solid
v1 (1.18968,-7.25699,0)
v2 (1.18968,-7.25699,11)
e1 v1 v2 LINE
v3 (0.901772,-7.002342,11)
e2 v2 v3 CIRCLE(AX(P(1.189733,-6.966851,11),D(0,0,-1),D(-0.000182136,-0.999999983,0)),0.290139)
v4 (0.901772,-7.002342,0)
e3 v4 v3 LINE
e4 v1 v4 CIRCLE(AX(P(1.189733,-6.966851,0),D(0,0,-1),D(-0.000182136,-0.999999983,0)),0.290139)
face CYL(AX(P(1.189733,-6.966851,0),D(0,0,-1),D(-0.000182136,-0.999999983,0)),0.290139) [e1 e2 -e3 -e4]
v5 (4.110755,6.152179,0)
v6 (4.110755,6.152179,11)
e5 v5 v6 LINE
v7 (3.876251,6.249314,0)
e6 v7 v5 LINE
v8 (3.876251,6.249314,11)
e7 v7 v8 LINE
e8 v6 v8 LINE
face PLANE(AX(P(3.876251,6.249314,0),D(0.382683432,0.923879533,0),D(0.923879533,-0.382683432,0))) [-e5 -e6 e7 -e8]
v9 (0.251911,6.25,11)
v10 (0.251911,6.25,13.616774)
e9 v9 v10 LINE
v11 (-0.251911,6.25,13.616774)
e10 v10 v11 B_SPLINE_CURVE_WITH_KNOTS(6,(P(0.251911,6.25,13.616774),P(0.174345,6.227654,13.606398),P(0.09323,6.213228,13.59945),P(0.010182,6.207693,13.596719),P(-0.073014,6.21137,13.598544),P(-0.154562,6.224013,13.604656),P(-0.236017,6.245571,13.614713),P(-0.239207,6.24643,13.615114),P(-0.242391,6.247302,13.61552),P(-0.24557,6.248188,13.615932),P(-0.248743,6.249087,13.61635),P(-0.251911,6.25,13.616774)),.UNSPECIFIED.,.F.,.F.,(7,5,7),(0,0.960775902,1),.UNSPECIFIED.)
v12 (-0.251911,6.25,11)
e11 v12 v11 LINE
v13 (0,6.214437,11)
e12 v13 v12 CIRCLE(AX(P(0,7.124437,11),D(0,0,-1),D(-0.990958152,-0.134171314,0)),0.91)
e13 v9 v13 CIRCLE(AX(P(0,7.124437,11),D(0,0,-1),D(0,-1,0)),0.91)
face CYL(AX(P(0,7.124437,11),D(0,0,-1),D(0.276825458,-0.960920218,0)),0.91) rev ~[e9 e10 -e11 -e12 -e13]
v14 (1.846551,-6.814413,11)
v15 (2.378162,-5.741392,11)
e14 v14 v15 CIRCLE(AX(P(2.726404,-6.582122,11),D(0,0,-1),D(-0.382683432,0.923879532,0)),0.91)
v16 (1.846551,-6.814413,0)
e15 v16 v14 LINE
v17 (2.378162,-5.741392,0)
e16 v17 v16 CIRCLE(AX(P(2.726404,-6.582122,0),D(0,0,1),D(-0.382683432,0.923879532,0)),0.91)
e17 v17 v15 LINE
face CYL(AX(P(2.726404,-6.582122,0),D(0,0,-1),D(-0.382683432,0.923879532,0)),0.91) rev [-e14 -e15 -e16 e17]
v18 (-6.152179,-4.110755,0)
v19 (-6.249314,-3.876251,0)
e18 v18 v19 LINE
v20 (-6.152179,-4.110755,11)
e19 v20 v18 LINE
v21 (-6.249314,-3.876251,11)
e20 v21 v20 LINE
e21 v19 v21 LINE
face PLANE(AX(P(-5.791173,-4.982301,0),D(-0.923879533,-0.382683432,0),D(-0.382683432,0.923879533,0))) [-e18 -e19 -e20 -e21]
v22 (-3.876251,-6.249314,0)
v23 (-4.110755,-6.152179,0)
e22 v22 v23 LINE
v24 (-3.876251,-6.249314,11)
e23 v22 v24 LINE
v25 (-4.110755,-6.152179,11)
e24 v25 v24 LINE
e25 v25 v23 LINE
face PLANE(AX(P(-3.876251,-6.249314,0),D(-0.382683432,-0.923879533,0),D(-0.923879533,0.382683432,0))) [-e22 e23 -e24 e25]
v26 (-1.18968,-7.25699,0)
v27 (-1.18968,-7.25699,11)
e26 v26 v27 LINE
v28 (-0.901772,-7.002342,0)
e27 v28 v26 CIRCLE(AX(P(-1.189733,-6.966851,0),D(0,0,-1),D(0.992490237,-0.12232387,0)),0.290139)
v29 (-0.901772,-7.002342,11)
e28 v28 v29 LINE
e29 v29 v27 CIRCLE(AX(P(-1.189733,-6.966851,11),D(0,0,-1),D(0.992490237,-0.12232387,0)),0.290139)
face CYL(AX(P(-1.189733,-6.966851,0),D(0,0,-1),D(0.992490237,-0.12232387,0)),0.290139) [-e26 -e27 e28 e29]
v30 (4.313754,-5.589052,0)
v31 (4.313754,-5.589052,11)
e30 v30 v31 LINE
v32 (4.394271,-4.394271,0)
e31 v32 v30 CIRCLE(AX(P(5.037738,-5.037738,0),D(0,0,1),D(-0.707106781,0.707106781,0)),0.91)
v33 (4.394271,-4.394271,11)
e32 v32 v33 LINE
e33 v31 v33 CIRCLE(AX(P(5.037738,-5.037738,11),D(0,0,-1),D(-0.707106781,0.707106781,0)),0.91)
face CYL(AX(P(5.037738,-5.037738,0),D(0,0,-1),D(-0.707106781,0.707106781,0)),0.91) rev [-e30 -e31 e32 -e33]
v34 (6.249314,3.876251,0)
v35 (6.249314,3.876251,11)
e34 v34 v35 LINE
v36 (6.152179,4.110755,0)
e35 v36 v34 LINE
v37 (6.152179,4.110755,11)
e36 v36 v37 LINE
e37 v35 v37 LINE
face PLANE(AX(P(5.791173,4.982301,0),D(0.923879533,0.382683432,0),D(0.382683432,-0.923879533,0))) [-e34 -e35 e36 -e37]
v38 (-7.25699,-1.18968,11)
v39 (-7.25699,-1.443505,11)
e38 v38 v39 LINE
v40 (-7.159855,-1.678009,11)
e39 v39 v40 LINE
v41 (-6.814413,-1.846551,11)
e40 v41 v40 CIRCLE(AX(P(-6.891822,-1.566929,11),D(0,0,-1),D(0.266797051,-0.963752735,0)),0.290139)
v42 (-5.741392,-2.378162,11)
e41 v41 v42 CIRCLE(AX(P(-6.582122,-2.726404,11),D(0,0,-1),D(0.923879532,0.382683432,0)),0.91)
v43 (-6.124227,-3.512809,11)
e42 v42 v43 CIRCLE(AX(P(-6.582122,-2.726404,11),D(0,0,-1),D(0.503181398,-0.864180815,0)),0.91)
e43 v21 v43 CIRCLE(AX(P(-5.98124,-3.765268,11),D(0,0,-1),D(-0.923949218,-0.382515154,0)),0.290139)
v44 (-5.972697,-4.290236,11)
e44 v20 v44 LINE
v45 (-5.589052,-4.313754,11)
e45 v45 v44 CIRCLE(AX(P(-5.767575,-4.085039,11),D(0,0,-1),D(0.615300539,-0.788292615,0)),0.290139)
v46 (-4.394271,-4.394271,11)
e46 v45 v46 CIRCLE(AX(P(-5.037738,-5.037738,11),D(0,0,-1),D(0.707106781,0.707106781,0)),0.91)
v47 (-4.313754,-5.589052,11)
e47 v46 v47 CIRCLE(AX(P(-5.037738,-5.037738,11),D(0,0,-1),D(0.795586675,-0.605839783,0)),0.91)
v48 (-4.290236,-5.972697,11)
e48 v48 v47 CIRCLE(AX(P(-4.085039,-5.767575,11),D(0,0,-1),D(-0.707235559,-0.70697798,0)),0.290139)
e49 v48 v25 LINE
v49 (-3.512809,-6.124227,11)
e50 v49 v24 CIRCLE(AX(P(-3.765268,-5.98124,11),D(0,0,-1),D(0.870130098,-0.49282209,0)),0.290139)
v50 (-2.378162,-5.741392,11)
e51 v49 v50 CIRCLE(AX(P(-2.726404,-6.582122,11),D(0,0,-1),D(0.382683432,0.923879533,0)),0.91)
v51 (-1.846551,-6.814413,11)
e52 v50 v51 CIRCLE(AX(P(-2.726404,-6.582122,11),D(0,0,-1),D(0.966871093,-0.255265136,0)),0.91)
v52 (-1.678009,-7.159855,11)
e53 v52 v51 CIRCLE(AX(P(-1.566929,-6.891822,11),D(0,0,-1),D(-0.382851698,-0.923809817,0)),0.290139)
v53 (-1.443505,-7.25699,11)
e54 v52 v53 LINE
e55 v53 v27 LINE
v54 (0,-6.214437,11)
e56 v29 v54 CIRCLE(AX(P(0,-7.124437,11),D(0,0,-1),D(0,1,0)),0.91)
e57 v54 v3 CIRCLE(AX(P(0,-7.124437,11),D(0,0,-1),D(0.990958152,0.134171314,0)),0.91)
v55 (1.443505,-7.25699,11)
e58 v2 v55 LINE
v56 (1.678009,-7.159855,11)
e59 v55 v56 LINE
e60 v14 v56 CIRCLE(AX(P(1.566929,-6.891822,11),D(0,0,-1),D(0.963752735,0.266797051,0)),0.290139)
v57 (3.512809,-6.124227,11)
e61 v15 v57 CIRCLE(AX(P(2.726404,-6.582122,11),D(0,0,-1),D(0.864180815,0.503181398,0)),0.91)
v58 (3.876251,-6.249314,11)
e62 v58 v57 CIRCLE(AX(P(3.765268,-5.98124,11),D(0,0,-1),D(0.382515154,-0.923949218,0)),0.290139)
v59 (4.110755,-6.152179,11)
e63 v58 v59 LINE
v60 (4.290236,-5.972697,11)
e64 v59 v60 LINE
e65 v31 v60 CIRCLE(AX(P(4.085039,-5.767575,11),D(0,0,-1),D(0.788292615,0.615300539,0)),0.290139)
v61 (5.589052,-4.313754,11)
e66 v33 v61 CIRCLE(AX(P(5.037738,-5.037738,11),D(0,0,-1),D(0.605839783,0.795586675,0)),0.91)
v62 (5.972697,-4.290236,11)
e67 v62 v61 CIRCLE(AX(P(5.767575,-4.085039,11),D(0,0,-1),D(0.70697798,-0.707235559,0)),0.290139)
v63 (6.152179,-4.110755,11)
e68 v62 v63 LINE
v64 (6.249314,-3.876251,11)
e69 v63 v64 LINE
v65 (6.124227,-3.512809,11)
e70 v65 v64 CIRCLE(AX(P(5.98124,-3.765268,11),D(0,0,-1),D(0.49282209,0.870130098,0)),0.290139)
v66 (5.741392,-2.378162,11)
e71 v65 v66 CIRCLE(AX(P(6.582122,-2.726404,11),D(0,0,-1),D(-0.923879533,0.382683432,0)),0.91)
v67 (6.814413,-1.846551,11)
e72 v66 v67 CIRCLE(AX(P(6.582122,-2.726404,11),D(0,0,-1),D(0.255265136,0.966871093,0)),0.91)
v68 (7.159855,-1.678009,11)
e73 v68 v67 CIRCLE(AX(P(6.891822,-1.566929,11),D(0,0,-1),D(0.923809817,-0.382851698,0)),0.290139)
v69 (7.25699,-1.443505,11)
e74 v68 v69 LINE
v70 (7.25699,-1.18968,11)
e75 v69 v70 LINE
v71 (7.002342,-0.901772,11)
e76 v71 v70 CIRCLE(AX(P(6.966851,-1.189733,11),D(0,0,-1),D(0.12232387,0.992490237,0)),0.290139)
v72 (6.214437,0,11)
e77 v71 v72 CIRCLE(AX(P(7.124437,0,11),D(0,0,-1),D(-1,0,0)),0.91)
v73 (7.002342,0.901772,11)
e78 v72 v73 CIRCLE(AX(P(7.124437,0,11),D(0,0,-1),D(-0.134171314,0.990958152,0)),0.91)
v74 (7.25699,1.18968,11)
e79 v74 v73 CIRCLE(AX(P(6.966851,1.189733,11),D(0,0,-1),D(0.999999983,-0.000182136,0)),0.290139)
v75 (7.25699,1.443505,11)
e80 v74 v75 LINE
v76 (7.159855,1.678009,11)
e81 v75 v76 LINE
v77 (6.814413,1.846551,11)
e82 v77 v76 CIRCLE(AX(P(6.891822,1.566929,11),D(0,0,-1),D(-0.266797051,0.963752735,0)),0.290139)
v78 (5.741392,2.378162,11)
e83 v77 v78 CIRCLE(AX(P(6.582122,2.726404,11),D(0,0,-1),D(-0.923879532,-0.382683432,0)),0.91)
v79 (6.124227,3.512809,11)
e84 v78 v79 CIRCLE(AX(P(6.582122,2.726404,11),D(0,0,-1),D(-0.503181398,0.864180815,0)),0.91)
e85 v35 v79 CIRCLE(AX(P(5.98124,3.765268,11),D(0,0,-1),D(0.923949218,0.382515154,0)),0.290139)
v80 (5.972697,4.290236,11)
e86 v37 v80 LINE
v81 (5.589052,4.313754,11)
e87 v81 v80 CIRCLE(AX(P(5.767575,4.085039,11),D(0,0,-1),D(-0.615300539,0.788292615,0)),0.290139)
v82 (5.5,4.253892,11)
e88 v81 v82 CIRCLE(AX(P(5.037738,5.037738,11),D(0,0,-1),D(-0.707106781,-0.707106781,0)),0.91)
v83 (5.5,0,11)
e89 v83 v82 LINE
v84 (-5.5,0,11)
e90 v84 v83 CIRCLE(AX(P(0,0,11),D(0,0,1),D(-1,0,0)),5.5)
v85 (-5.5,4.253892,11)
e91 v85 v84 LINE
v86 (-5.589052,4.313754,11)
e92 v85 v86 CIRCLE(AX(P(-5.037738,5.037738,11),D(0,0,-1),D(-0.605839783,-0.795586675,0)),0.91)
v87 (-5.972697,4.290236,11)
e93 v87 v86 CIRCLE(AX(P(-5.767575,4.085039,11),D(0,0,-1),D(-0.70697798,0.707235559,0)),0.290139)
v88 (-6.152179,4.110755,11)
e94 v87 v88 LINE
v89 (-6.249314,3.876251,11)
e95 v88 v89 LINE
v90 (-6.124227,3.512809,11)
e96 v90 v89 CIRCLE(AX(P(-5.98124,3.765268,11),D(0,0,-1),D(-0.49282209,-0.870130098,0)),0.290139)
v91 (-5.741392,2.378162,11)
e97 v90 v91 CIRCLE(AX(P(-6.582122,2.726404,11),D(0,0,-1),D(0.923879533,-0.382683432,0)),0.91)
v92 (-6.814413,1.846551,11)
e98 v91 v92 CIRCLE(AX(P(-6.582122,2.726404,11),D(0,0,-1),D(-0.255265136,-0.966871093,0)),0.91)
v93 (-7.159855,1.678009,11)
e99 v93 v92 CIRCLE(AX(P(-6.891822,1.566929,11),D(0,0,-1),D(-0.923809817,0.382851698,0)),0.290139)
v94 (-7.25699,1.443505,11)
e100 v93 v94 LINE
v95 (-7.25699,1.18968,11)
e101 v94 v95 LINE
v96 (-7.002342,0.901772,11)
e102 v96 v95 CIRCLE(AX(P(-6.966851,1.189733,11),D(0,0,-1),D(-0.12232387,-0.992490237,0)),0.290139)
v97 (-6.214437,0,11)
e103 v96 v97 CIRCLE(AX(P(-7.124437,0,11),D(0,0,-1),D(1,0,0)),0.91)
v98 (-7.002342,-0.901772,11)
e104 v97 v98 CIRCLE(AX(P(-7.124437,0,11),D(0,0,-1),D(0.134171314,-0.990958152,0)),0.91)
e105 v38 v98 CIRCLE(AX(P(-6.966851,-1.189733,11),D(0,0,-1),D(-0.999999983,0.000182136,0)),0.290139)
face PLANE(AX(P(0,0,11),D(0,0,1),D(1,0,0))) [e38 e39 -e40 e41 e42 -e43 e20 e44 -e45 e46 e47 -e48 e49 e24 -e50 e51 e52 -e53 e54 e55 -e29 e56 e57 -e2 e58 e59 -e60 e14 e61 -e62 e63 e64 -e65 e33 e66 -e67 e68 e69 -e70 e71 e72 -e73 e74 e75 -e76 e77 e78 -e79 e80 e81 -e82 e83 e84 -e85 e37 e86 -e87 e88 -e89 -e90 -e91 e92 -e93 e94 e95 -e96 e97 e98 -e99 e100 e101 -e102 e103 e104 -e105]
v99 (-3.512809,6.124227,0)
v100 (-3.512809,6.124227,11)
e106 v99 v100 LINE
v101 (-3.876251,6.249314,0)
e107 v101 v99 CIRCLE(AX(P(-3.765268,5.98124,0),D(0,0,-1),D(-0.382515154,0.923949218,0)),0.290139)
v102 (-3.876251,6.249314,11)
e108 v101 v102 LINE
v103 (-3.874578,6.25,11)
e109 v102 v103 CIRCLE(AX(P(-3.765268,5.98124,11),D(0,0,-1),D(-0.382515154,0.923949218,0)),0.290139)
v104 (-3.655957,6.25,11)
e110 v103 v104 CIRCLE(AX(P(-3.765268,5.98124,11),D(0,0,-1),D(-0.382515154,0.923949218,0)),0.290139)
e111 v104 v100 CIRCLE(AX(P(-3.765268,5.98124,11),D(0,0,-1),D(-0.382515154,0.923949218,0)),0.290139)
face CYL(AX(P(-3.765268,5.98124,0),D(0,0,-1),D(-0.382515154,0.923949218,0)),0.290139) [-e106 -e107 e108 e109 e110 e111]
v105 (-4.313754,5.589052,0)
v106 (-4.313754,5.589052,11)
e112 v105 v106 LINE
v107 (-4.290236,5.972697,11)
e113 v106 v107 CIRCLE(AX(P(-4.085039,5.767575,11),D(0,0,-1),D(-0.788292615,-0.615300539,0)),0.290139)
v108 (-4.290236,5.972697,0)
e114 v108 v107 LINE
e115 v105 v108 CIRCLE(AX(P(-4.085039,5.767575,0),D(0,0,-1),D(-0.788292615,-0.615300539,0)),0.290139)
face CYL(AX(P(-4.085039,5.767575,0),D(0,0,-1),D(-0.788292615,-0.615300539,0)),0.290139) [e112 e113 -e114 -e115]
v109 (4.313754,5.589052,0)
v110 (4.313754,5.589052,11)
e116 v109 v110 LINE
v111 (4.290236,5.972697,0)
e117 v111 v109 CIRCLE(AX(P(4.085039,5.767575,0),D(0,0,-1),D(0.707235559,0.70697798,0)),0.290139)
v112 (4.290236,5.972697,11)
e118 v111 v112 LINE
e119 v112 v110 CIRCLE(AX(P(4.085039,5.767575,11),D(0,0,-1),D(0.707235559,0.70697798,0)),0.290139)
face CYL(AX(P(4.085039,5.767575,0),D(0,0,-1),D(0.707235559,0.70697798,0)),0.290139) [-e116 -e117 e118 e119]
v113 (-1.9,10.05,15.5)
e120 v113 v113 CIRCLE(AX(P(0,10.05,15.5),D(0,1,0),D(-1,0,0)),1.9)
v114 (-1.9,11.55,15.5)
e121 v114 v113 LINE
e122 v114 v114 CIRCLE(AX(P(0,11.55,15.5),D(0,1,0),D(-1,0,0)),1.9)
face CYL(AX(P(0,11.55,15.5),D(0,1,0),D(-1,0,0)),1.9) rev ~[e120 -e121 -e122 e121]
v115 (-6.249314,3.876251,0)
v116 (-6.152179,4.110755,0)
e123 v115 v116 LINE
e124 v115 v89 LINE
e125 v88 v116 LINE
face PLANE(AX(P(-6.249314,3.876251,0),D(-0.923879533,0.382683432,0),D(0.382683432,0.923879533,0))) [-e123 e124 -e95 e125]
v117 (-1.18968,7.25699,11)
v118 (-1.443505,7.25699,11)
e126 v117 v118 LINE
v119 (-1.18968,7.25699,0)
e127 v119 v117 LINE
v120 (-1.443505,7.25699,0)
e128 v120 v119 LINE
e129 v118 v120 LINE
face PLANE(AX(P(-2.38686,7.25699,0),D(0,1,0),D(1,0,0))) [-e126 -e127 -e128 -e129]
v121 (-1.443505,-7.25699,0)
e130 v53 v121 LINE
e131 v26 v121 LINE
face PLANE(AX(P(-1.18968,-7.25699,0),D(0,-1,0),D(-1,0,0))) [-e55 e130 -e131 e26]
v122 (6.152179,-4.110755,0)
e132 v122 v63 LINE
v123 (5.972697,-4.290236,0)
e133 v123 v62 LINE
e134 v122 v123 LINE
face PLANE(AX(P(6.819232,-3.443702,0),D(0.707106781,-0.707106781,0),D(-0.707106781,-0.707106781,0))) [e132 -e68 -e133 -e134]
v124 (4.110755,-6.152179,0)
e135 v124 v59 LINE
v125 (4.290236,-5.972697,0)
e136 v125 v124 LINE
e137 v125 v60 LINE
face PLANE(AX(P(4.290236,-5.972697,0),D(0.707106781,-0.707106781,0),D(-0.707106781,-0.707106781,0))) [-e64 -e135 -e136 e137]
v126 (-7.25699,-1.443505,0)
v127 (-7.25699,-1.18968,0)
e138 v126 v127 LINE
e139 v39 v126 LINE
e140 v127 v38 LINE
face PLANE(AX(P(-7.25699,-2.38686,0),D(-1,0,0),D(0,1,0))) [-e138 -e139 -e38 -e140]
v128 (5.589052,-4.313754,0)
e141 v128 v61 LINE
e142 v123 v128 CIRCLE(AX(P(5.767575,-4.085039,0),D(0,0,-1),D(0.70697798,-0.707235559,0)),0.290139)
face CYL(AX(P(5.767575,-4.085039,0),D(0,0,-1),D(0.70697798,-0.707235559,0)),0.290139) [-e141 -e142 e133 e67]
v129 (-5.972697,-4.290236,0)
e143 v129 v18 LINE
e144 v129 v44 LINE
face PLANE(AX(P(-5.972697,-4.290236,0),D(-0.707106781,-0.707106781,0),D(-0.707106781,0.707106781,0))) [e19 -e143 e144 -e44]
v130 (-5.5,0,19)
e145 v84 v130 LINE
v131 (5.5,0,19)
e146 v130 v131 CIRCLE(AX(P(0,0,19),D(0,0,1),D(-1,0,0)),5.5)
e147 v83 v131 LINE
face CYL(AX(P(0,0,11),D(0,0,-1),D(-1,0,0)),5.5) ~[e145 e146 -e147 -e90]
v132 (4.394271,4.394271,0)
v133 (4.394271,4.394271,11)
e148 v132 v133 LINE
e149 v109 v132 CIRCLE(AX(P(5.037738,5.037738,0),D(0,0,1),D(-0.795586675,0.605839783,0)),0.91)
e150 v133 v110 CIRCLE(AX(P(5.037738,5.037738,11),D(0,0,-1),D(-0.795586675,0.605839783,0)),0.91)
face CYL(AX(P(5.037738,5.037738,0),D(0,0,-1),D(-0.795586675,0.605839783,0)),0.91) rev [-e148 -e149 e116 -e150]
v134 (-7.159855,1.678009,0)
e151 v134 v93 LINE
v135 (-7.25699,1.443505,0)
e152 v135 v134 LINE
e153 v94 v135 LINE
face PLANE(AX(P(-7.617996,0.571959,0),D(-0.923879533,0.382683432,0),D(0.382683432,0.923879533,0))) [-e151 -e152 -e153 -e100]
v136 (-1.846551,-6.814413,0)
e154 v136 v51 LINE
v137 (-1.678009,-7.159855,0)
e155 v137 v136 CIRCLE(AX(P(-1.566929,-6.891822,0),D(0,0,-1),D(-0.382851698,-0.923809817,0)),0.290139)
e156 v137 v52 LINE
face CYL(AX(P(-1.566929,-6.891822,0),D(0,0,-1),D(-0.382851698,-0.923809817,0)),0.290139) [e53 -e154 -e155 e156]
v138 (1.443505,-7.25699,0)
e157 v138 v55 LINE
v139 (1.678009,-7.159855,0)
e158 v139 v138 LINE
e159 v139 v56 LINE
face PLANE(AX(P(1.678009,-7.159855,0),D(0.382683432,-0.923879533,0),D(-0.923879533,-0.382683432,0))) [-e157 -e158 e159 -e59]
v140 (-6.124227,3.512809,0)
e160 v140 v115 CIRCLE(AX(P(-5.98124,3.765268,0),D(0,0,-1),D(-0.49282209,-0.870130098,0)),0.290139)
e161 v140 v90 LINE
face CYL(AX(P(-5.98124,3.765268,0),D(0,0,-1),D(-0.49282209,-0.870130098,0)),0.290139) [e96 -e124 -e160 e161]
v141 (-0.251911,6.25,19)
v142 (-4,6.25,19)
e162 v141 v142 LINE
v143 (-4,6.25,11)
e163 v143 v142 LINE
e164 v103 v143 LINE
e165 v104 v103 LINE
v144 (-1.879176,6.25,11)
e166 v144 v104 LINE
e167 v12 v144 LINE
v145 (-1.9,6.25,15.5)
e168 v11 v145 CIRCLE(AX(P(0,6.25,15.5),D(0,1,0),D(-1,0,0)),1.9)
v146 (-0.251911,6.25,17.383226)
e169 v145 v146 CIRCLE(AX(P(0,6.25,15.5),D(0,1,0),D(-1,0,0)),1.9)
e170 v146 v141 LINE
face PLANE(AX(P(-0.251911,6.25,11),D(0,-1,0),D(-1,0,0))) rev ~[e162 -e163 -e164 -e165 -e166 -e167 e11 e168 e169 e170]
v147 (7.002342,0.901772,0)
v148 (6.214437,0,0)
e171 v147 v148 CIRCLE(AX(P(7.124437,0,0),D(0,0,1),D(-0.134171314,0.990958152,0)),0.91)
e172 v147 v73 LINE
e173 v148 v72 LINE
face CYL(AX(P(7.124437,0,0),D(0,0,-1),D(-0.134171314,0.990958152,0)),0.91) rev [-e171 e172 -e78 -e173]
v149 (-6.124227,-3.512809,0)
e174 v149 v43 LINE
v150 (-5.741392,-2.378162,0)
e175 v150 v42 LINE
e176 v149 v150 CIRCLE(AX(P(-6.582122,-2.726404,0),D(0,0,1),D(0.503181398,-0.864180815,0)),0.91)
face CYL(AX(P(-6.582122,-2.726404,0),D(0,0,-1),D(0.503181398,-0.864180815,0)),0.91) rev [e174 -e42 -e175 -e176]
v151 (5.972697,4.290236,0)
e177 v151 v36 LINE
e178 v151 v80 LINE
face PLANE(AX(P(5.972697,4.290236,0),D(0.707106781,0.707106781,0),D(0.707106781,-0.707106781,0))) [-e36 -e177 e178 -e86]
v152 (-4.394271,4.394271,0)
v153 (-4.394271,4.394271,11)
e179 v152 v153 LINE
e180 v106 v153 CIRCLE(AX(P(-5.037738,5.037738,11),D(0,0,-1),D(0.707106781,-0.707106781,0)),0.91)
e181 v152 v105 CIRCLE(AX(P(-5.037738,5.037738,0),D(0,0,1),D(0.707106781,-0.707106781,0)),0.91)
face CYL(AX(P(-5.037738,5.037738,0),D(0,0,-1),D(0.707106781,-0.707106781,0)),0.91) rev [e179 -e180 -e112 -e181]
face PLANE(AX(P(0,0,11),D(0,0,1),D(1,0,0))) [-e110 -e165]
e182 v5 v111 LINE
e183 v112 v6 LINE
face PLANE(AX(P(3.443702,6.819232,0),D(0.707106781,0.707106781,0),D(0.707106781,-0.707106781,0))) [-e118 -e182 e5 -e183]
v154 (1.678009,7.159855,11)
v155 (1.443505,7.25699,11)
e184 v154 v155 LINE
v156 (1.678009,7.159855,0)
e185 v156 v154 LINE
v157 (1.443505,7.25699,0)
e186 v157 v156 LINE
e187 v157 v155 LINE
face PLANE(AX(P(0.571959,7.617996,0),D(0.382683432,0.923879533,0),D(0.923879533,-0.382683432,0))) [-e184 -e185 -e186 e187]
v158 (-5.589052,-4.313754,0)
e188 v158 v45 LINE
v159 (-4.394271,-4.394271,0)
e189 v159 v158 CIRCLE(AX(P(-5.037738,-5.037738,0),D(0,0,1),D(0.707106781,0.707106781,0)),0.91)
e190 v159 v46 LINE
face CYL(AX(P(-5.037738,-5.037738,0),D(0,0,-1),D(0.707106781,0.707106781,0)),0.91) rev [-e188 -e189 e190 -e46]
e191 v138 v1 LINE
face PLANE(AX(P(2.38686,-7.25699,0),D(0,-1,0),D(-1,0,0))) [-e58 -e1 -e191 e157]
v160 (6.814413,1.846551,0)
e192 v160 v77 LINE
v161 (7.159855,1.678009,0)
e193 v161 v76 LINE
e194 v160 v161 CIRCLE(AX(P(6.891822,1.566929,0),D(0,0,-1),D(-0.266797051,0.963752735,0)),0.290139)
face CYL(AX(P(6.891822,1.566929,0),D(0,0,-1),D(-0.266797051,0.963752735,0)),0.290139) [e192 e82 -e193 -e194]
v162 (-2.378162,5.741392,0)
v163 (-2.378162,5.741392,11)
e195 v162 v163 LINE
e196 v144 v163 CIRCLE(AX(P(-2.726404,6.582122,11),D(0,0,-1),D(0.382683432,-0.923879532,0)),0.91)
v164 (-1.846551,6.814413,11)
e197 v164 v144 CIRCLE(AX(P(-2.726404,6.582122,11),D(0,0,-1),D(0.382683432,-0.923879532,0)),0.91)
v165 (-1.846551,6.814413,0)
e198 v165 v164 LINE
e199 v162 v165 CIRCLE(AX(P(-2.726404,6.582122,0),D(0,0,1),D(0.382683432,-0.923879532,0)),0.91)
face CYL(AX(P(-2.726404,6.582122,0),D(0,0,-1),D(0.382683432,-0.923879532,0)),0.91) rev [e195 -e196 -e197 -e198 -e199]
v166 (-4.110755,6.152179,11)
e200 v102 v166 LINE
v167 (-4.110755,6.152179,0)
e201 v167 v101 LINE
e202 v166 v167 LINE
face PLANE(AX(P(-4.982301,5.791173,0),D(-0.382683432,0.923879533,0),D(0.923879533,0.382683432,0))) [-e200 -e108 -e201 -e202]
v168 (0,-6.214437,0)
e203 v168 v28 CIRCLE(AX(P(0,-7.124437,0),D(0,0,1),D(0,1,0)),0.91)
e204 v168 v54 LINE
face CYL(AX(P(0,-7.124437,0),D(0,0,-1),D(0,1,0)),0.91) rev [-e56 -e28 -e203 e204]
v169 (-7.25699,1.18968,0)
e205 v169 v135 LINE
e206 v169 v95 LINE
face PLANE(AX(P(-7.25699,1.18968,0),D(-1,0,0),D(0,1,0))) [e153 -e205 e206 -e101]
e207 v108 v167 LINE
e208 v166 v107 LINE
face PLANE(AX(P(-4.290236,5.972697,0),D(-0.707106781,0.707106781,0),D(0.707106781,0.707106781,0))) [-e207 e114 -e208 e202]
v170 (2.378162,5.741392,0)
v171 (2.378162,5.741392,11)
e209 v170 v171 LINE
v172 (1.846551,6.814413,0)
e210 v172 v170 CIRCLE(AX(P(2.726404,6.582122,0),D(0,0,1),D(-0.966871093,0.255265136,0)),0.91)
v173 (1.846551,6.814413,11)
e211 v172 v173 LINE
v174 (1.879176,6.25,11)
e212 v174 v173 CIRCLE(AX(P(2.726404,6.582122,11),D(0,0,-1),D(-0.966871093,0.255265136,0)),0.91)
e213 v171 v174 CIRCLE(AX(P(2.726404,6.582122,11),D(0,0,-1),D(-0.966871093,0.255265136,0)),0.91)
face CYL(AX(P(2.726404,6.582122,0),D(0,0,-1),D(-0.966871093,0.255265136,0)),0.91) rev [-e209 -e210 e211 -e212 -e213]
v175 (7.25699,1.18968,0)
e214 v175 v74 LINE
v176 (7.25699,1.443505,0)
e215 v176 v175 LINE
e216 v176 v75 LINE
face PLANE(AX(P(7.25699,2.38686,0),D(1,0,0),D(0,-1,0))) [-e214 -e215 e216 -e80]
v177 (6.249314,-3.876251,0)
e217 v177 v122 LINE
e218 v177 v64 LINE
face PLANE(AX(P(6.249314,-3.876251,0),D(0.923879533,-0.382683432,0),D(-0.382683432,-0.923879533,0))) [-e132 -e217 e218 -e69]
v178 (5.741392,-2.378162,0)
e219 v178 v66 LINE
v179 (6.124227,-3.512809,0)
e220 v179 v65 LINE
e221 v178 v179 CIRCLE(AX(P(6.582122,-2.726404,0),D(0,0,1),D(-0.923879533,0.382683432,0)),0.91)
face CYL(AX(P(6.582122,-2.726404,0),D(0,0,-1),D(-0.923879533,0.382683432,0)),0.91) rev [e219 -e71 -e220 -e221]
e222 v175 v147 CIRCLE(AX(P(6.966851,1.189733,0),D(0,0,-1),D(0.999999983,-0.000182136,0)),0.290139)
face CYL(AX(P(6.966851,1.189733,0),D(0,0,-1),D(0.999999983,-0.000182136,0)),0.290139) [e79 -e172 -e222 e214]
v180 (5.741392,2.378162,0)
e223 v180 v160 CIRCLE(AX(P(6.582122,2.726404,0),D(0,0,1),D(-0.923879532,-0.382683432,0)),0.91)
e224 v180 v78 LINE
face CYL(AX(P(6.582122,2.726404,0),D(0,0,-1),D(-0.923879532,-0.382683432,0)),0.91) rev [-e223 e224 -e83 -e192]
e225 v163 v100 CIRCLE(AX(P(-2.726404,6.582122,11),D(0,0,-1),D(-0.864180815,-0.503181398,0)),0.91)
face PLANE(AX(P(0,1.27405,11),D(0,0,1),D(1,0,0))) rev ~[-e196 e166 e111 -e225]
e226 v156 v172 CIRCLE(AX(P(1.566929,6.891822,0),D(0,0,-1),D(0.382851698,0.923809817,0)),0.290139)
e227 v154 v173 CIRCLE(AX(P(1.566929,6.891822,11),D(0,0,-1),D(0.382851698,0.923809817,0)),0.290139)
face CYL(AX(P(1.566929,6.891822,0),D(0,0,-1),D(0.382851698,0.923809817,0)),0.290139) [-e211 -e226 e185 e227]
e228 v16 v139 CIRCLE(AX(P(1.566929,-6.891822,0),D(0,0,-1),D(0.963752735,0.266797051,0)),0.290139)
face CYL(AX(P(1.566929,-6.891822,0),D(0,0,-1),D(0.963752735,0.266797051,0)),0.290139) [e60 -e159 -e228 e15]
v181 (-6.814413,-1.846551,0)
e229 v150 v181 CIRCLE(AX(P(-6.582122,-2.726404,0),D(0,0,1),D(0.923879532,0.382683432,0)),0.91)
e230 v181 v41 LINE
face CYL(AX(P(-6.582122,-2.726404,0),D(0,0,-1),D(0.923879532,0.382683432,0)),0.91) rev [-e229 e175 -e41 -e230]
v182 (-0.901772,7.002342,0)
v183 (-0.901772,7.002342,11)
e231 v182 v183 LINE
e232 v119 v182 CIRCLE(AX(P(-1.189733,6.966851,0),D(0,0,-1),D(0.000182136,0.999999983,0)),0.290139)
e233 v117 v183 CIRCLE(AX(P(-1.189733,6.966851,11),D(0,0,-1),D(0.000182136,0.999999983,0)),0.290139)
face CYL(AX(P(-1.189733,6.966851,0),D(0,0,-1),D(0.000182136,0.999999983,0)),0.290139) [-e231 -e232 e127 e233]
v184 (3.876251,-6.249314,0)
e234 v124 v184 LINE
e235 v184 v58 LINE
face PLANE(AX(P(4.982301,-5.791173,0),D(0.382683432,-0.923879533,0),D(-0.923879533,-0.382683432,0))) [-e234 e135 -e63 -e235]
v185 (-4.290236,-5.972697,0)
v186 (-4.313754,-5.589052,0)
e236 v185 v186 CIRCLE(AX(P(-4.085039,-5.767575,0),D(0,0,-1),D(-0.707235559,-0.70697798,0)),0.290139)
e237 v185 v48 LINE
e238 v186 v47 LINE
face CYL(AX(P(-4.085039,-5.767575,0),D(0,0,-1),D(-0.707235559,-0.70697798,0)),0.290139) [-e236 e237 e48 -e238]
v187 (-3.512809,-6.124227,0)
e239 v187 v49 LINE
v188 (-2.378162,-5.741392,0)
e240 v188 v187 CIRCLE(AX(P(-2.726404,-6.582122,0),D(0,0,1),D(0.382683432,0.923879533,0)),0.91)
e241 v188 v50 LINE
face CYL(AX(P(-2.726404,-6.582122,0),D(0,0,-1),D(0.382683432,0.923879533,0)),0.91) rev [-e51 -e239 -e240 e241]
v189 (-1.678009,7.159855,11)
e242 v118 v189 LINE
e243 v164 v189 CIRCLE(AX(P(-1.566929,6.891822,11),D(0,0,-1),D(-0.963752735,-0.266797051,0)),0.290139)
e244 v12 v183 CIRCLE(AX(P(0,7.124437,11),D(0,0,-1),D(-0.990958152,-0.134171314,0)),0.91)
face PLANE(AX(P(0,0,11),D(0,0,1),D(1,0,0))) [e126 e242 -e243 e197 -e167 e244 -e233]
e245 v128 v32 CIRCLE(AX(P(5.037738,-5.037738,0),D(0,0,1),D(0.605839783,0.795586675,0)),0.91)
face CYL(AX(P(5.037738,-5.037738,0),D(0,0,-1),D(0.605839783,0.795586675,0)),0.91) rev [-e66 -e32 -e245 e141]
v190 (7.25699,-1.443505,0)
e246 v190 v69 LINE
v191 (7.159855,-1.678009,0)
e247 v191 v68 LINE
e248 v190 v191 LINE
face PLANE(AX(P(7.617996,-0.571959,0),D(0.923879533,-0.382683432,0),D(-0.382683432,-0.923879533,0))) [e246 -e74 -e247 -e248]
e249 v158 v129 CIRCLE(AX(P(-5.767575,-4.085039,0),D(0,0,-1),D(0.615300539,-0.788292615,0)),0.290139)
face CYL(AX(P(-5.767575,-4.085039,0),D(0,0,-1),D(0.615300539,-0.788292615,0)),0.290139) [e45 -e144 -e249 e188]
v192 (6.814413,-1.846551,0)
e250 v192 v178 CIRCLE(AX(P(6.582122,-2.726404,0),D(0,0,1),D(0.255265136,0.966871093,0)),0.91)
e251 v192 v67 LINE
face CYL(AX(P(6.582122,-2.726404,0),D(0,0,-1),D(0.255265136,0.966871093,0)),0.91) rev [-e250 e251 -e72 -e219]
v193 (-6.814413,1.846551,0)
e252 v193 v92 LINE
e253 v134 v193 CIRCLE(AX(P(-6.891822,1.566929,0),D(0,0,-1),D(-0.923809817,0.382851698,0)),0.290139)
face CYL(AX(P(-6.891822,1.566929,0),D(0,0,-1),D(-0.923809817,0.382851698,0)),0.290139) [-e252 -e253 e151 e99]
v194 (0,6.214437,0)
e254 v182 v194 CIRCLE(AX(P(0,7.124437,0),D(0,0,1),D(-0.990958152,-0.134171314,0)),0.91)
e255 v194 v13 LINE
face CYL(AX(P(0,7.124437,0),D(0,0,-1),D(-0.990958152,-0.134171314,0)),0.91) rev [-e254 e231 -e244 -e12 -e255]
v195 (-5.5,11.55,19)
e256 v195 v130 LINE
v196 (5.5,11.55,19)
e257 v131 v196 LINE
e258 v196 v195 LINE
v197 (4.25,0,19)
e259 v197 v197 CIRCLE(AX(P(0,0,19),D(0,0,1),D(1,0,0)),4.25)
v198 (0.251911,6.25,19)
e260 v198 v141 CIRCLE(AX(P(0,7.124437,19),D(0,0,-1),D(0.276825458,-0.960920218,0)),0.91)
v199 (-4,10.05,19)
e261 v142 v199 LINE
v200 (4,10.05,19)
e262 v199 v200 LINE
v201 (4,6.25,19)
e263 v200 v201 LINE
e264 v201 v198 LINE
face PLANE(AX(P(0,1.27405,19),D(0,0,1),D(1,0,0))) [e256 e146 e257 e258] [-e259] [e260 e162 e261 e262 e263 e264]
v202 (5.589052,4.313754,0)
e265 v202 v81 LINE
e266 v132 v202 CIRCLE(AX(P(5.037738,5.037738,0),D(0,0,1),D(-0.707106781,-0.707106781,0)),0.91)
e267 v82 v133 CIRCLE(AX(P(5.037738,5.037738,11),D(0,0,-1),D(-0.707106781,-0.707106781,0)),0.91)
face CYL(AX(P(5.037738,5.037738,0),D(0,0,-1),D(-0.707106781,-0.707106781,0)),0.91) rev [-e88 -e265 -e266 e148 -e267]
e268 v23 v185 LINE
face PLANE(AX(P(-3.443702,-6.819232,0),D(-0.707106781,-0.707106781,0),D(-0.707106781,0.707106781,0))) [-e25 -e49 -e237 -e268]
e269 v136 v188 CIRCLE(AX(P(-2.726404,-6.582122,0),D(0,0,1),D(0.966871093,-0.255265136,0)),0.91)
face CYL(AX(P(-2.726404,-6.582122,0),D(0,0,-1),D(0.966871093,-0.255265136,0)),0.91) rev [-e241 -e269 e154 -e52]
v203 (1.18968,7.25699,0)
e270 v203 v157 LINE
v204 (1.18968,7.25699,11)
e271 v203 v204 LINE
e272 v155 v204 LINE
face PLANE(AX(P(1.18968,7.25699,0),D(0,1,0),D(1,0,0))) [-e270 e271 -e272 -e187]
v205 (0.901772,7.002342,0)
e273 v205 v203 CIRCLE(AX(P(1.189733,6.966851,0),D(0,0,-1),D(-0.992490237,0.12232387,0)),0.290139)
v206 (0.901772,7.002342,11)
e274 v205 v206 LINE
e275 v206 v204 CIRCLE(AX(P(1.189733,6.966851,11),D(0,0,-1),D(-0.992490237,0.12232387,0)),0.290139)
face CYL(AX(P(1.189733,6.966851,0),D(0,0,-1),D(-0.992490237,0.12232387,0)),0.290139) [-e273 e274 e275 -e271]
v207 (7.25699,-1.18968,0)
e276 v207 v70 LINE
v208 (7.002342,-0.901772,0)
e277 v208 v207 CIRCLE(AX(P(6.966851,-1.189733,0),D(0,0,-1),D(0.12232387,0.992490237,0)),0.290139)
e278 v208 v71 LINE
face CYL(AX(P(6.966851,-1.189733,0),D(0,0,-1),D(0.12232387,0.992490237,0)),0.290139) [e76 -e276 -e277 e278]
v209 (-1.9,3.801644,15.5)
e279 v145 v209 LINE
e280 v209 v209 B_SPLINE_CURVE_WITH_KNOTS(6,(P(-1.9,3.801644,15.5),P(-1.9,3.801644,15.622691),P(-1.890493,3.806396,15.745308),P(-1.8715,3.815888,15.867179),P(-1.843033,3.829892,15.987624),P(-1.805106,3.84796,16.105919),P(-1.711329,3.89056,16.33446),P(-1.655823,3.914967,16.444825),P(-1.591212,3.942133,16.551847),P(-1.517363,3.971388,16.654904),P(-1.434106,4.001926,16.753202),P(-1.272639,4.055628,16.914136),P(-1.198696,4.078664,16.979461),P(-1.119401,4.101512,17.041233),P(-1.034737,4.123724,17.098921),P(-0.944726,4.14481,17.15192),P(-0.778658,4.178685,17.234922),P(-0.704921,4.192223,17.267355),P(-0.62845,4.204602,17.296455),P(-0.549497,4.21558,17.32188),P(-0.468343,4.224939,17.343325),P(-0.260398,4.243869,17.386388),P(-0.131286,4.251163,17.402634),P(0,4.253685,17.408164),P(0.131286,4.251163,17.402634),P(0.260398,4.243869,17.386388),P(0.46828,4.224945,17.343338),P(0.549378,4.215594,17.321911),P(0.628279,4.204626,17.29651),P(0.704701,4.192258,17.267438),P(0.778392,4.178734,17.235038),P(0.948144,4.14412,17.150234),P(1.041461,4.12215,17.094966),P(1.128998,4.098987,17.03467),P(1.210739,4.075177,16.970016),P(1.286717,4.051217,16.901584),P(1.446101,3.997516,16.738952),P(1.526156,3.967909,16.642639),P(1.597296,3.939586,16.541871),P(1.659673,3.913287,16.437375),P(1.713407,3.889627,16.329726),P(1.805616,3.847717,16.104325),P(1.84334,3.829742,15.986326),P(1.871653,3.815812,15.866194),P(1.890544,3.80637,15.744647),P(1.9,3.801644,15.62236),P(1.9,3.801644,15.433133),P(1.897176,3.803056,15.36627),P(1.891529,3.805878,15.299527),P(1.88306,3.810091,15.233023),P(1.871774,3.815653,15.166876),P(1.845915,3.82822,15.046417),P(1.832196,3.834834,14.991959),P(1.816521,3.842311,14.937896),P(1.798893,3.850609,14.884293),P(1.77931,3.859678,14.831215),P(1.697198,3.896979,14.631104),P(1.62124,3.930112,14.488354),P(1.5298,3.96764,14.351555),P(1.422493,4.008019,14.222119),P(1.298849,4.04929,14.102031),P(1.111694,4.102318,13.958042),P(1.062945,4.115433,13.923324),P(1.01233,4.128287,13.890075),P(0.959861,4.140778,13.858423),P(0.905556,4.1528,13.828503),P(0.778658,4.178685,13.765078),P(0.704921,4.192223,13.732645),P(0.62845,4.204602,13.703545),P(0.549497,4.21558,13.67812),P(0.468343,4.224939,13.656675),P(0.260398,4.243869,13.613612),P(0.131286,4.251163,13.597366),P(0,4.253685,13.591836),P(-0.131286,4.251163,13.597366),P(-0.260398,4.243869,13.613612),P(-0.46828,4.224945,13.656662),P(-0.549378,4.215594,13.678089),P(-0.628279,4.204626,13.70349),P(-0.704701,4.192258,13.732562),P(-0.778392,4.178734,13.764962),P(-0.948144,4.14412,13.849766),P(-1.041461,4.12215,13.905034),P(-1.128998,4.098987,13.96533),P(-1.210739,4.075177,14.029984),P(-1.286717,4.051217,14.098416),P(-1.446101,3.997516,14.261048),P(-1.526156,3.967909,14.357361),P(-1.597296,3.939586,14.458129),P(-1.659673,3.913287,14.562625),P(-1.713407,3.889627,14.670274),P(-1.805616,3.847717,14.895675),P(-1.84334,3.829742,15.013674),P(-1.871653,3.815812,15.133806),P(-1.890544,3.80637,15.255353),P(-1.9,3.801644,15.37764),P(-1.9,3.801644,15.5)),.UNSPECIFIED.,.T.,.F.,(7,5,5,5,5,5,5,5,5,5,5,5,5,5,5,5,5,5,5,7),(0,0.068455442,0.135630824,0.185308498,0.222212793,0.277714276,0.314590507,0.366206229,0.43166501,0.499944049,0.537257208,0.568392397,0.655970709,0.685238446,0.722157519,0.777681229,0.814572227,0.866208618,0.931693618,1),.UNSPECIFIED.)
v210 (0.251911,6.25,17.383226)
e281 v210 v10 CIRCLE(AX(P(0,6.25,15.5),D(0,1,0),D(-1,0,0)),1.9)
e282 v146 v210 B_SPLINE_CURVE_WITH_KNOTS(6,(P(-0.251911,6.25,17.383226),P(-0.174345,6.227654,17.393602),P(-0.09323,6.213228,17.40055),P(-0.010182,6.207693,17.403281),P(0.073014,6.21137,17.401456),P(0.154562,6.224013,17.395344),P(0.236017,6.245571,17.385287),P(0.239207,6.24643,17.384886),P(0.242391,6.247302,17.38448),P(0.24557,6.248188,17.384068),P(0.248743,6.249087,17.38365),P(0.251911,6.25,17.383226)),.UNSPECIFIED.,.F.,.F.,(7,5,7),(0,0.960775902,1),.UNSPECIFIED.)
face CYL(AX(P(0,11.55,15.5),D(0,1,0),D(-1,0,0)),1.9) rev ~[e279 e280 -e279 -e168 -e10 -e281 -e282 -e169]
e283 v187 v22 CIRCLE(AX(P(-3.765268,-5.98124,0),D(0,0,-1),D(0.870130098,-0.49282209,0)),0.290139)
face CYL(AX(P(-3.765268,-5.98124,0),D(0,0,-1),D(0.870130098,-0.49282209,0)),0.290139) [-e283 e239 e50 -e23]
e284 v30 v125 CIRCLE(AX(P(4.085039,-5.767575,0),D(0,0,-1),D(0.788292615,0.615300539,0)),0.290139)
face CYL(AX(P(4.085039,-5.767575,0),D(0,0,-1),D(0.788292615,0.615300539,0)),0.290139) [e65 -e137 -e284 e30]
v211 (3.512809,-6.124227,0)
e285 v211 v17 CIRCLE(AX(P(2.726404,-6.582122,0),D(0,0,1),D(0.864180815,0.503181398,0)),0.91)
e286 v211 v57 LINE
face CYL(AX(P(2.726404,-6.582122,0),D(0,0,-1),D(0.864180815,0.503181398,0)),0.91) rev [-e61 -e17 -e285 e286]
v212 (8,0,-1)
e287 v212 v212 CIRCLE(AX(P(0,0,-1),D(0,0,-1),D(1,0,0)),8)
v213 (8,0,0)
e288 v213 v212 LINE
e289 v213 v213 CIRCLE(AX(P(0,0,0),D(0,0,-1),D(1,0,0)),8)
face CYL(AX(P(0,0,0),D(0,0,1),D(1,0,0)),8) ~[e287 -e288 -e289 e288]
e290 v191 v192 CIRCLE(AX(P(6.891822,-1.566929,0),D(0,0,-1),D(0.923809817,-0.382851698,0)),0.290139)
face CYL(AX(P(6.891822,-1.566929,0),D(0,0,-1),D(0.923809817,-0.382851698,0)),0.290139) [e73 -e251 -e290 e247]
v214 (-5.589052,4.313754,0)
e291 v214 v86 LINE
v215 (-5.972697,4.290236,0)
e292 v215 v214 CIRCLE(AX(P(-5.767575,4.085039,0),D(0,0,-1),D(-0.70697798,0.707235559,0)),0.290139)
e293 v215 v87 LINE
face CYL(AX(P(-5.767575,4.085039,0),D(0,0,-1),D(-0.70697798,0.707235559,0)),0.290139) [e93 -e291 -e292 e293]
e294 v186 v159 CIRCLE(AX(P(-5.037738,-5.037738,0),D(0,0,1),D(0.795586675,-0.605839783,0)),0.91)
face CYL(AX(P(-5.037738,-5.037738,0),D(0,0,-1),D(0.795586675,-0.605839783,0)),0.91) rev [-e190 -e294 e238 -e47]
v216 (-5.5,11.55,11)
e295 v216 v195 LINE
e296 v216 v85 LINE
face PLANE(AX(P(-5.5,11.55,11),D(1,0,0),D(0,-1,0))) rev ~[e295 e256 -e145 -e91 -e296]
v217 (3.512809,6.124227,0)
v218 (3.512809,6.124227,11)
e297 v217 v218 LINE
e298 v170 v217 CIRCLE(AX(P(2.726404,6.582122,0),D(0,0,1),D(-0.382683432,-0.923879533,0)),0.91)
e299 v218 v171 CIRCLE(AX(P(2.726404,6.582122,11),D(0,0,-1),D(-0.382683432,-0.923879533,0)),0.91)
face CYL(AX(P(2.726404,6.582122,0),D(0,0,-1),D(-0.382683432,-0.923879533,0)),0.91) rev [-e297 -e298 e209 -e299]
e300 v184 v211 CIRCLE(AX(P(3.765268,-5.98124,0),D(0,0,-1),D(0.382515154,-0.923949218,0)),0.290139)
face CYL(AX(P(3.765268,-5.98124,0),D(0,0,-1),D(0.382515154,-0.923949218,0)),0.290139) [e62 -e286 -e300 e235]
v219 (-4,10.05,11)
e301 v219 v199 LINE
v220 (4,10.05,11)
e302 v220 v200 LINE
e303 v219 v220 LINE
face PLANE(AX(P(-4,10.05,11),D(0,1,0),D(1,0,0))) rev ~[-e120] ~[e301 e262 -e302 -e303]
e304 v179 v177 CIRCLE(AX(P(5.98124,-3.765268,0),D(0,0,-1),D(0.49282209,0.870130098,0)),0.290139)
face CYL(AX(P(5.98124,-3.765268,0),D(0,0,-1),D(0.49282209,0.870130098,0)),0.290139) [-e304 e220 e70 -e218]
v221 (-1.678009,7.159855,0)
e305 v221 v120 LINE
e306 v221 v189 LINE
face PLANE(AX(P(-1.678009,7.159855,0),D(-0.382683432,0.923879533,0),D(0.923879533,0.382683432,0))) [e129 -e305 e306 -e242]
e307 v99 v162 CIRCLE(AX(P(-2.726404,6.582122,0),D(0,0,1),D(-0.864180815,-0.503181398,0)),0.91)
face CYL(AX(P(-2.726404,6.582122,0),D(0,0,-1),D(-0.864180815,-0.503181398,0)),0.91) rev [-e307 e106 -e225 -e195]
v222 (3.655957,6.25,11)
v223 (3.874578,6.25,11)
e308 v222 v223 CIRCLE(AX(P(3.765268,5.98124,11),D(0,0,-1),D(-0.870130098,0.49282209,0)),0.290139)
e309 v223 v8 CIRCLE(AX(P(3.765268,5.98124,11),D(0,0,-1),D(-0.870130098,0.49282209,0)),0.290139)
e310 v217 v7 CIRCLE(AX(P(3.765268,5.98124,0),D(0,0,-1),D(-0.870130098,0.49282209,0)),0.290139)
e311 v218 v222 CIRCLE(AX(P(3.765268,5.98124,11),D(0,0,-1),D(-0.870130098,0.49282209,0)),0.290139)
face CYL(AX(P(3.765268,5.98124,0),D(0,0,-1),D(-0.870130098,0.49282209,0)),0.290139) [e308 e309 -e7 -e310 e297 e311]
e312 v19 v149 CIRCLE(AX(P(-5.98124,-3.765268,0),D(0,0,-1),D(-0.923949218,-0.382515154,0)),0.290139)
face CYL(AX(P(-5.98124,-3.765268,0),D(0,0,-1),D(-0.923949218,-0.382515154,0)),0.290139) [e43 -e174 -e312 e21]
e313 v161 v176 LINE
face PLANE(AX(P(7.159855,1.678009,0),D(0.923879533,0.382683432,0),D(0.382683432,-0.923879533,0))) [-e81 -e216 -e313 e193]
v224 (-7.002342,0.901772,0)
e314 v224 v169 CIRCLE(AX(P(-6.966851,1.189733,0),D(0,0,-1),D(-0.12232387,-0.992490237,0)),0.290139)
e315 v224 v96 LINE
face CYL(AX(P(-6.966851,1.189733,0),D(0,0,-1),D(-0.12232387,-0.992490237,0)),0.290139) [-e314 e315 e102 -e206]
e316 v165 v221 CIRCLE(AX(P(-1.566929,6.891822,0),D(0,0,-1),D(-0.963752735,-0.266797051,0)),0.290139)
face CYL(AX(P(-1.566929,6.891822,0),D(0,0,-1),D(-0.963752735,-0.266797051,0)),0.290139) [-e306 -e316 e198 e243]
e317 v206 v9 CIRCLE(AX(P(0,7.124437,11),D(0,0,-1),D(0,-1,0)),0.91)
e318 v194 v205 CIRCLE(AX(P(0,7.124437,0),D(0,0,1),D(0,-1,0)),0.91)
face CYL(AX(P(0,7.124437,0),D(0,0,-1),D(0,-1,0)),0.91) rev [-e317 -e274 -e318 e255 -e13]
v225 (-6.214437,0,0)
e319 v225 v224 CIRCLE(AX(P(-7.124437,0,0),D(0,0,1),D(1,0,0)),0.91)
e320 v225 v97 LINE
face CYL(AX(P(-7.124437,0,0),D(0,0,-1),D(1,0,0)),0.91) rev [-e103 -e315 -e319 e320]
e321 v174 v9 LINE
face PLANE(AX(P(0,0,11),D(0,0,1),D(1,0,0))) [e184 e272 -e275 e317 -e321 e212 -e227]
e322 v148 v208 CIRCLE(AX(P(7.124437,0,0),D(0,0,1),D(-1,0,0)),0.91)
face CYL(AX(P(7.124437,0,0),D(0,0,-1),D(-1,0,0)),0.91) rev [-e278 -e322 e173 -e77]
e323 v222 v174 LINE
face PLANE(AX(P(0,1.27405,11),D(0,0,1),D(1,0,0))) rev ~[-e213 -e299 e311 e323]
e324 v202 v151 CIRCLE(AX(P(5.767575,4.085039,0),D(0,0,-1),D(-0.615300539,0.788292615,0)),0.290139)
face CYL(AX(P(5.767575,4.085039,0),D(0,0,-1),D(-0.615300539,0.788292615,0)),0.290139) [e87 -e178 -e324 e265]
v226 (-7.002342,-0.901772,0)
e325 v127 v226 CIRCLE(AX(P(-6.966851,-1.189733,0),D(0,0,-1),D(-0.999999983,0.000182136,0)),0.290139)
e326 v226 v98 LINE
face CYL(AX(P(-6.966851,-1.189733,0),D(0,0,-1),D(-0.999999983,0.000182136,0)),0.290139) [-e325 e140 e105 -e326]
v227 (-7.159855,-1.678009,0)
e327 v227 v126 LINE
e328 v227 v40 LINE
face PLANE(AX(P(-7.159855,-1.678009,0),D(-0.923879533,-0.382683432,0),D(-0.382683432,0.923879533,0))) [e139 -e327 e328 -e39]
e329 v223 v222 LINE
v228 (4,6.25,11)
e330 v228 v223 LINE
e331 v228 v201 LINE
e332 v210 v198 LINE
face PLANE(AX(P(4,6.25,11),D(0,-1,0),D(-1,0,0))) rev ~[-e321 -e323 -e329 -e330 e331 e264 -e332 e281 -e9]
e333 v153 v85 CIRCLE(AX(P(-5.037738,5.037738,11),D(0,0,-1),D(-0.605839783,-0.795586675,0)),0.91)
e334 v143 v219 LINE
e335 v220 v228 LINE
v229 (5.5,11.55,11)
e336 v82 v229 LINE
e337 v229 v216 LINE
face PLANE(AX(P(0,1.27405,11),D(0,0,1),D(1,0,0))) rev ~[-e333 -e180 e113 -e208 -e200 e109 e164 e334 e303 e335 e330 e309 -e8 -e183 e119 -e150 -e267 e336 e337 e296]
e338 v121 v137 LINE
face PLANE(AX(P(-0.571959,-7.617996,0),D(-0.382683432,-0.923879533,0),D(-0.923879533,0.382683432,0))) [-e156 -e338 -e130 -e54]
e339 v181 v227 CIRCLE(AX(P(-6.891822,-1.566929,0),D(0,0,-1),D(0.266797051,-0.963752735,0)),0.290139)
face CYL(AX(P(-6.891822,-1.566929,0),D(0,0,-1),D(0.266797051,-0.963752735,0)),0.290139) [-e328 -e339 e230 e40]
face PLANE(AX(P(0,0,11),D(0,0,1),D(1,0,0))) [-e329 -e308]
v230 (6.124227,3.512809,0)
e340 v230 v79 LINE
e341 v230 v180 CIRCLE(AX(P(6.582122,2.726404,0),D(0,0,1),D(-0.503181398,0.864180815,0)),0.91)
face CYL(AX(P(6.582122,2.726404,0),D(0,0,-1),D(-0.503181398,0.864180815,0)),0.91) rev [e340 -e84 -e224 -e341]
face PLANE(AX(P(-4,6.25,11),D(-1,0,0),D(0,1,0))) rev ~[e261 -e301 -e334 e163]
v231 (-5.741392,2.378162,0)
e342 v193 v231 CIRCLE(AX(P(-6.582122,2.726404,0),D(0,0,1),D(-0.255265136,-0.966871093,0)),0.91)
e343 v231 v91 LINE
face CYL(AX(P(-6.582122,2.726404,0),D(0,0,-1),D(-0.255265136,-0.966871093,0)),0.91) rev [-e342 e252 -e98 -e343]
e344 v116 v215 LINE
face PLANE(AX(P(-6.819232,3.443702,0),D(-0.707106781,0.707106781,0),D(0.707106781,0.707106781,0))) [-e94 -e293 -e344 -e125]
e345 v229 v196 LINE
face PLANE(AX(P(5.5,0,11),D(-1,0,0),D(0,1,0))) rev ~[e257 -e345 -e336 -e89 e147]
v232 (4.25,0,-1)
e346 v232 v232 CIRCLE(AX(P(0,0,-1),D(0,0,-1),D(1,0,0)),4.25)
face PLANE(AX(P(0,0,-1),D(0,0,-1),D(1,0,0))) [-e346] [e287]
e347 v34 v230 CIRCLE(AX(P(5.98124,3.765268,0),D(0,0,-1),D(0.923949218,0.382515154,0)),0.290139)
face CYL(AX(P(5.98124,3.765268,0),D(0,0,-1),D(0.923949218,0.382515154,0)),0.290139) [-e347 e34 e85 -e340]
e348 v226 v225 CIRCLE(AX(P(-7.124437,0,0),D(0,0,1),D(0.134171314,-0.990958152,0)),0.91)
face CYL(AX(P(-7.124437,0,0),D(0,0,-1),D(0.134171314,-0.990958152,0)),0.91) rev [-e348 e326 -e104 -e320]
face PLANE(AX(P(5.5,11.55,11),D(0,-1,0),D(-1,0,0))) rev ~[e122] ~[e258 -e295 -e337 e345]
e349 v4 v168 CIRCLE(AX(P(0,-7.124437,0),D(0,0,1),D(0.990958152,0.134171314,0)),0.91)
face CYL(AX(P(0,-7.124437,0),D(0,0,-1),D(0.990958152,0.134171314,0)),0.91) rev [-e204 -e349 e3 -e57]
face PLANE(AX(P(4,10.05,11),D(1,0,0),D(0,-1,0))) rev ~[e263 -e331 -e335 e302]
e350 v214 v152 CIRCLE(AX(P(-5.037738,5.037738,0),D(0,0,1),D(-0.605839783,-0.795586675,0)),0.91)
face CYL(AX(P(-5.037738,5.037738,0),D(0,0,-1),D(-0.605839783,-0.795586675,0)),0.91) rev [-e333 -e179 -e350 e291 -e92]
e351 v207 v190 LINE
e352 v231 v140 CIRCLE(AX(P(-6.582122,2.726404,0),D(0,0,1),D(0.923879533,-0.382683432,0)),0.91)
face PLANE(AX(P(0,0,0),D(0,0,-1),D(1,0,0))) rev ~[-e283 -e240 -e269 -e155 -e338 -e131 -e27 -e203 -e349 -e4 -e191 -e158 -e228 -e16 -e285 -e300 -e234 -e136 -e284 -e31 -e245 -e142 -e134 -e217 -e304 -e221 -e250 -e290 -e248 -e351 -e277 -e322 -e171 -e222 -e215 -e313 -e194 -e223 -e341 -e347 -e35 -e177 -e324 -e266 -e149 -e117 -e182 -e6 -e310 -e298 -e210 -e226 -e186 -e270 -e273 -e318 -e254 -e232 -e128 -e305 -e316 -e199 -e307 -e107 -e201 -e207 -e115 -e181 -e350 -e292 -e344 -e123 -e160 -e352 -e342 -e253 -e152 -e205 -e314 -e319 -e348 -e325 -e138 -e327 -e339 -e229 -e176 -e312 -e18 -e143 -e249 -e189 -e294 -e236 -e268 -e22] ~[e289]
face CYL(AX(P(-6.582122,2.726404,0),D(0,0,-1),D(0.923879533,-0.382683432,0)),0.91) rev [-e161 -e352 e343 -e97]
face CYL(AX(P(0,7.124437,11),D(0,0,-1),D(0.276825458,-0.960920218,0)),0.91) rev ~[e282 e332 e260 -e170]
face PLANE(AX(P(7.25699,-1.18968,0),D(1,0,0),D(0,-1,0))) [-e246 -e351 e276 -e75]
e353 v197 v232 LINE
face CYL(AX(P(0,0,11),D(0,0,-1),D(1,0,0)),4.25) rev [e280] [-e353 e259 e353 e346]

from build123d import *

# Parameters (mm, degrees)
F0_R             = 7.6394373987
F0_R_2           = 4.25
F1_DEPTH         = 11
F3_DEPTH         = 11.001
F3_COPIES_COUNT  = 8
F3_COPIES_ANGLE  = 157.5
F3_COPIES1_COUNT = 9
F3_COPIES1_ANGLE = 180
F4_R             = 8
F4_R_2           = 4.25
F5_DEPTH         = 1
F6_R             = 4.25
F7_DEPTH         = 8
F8_R             = 1.9
F9_DEPTH         = 10


# Not quite as in the source:
# - ends of sketch curves that miss each other by under 0.0002 mm in the source are joined
# - a pattern or mirror of a feature is missing from the dataset's text; its kind, count and spacing are read off the source's solid
# - a feature names something its author has since deleted; it is built from what else it names


with BuildPart() as f1:
    # F0 (on Top) → F1 (new body)
    with BuildSketch(Plane.XY):
        Circle(F0_R)
        Circle(F0_R_2, mode=Mode.SUBTRACT)
    extrude(amount=F1_DEPTH)

    # F2 (on Top) → F3 (cut, through all)
    with BuildSketch(Plane.XY):
        with BuildLine():
            ThreePointArc((0.9017719181, -7.0023415032), (0.5987456618, -6.4391610804), (0, -6.2144373987))
            ThreePointArc((0, -6.2144373987), (-0.5987456618, -6.4391610804), (-0.9017719181, -7.0023415032))
            ThreePointArc((-0.9017719181, -7.0023415032), (-0.9975198669, -7.184187159), (-1.1896796808, -7.25699))
            Line((-1.1896796808, -7.25699), (-2.3868598428, -7.25699))
            ThreePointArc((-2.3868598428, -7.25699), (0, -7.6394373987), (2.3868598428, -7.25699))
            Line((2.3868598428, -7.25699), (1.1896796808, -7.25699))
            ThreePointArc((1.1896796808, -7.25699), (0.9975198669, -7.184187159), (0.9017719181, -7.0023415032))
        make_face()
    f3 = extrude(amount=F3_DEPTH, mode=Mode.SUBTRACT)

    # F3_copies: F3 ×8 about axis
    f3_copies_axis = Axis((0, 0, 0), (0, 0, -1))
    for i in range(1, F3_COPIES_COUNT):
        add(f3.rotate(f3_copies_axis, i * F3_COPIES_ANGLE / (F3_COPIES_COUNT - 1)), mode=Mode.SUBTRACT)

    # F3_copies1: F3 ×9 about axis
    f3_copies1_axis = Axis((0, 0, 0), (0, 0, 1))
    for i in range(1, F3_COPIES1_COUNT):
        add(f3.rotate(f3_copies1_axis, i * F3_COPIES1_ANGLE / (F3_COPIES1_COUNT - 1)), mode=Mode.SUBTRACT)

    # F4 (on face) → F5 (join)
    with BuildSketch(Plane(origin=(0, 0, 0), x_dir=(1, 0, 0), z_dir=(0, 0, -1))):
        Circle(F4_R)
        Circle(F4_R_2, mode=Mode.SUBTRACT)
    extrude(amount=F5_DEPTH)

    # F6 (on face) → F7 (join)
    with BuildSketch(Plane.XY.offset(11)):
        with BuildLine():
            Line((-5.5, 4.2538924505), (-5.5, 0))
            ThreePointArc((-5.5, 0), (0, -5.5), (5.5, 0))
            Line((5.5, 0), (5.5, 4.2538924505))
            ThreePointArc((5.5, 4.2538924505), (4.3574531497, 4.4333271044), (4.3137541227, 5.5890521994))
            ThreePointArc((4.3137541227, 5.5890521994), (4.3746351807, 5.7853277116), (4.2902362702, 5.9726974098))
            Line((4.2902362702, 5.9726974098), (4.1107546227, 6.1521790573))
            Line((4.1107546227, 6.1521790573), (3.8762505492, 6.249313825))
            ThreePointArc((3.8762505492, 6.249313825), (3.8754150111, 6.2496582146), (3.8745784043, 6.25))
            Line((3.8745784043, 6.25), (3.6559571933, 6.25))
            ThreePointArc((3.6559571933, 6.25), (3.5737630913, 6.1992003777), (3.5128086992, 6.1242268216))
            ThreePointArc((3.5128086992, 6.1242268216), (2.65655008, 5.6748069492), (1.8791762967, 6.25))
            Line((1.8791762967, 6.25), (0.2519111663, 6.25))
            ThreePointArc((0.2519111663, 6.25), (0, 6.2144373987), (-0.2519111663, 6.25))
            Line((-0.2519111663, 6.25), (-1.8791762967, 6.25))
            ThreePointArc((-1.8791762967, 6.25), (-2.65655008, 5.6748069492), (-3.5128086992, 6.1242268216))
            ThreePointArc((-3.5128086992, 6.1242268216), (-3.5737630913, 6.1992003777), (-3.6559571933, 6.25))
            Line((-3.6559571933, 6.25), (-3.8745784043, 6.25))
            ThreePointArc((-3.8745784043, 6.25), (-3.8754150111, 6.2496582146), (-3.8762505492, 6.249313825))
            Line((-3.8762505492, 6.249313825), (-4.1107546227, 6.1521790573))
            Line((-4.1107546227, 6.1521790573), (-4.2902362702, 5.9726974098))
            ThreePointArc((-4.2902362702, 5.9726974098), (-4.3746351807, 5.7853277116), (-4.3137541227, 5.5890521994))
            ThreePointArc((-4.3137541227, 5.5890521994), (-4.3574531497, 4.4333271044), (-5.5, 4.2538924505))
        make_face()
        Circle(F6_R, mode=Mode.SUBTRACT)
        with BuildLine():
            Line((-5.5, 11.55), (-5.5, 4.2538924505))
            ThreePointArc((-5.5, 4.2538924505), (-4.3574531497, 4.4333271044), (-4.3137541227, 5.5890521994))
            ThreePointArc((-4.3137541227, 5.5890521994), (-4.3746351807, 5.7853277116), (-4.2902362702, 5.9726974098))
            Line((-4.2902362702, 5.9726974098), (-4.1107546227, 6.1521790573))
            Line((-4.1107546227, 6.1521790573), (-3.8762505492, 6.249313825))
            ThreePointArc((-3.8762505492, 6.249313825), (-3.8754150111, 6.2496582146), (-3.8745784043, 6.25))
            Line((-3.8745784043, 6.25), (-4, 6.25))
            Line((-4, 6.25), (-4, 10.05))
            Line((-4, 10.05), (4, 10.05))
            Line((4, 10.05), (4, 6.25))
            Line((4, 6.25), (3.8745784043, 6.25))
            ThreePointArc((3.8745784043, 6.25), (3.8754150111, 6.2496582146), (3.8762505492, 6.249313825))
            Line((3.8762505492, 6.249313825), (4.1107546227, 6.1521790573))
            Line((4.1107546227, 6.1521790573), (4.2902362702, 5.9726974098))
            ThreePointArc((4.2902362702, 5.9726974098), (4.3746351807, 5.7853277116), (4.3137541227, 5.5890521994))
            ThreePointArc((4.3137541227, 5.5890521994), (4.3574531497, 4.4333271044), (5.5, 4.2538924505))
            Line((5.5, 4.2538924505), (5.5, 11.55))
            Line((5.5, 11.55), (-5.5, 11.55))
        make_face()
        with BuildLine():
            Line((-1.8791762967, 6.25), (-3.6559571933, 6.25))
            ThreePointArc((-3.6559571933, 6.25), (-3.5737630913, 6.1992003777), (-3.5128086992, 6.1242268216))
            ThreePointArc((-3.5128086992, 6.1242268216), (-2.65655008, 5.6748069492), (-1.8791762967, 6.25))
        make_face()
        with BuildLine():
            ThreePointArc((3.5128086992, 6.1242268216), (3.5737630913, 6.1992003777), (3.6559571933, 6.25))
            Line((3.6559571933, 6.25), (1.8791762967, 6.25))
            ThreePointArc((1.8791762967, 6.25), (2.65655008, 5.6748069492), (3.5128086992, 6.1242268216))
        make_face()
    extrude(amount=F7_DEPTH)

    # F8 (on face) → F9 (cut)
    with BuildSketch(Plane(origin=(0, 11.55, 0), x_dir=(-1, 0, 0), z_dir=(0, 1, 0))):
        with Locations((0, 15.5)):
            Circle(F8_R)
    extrude(amount=-F9_DEPTH, mode=Mode.SUBTRACT)


solid = f1.part
